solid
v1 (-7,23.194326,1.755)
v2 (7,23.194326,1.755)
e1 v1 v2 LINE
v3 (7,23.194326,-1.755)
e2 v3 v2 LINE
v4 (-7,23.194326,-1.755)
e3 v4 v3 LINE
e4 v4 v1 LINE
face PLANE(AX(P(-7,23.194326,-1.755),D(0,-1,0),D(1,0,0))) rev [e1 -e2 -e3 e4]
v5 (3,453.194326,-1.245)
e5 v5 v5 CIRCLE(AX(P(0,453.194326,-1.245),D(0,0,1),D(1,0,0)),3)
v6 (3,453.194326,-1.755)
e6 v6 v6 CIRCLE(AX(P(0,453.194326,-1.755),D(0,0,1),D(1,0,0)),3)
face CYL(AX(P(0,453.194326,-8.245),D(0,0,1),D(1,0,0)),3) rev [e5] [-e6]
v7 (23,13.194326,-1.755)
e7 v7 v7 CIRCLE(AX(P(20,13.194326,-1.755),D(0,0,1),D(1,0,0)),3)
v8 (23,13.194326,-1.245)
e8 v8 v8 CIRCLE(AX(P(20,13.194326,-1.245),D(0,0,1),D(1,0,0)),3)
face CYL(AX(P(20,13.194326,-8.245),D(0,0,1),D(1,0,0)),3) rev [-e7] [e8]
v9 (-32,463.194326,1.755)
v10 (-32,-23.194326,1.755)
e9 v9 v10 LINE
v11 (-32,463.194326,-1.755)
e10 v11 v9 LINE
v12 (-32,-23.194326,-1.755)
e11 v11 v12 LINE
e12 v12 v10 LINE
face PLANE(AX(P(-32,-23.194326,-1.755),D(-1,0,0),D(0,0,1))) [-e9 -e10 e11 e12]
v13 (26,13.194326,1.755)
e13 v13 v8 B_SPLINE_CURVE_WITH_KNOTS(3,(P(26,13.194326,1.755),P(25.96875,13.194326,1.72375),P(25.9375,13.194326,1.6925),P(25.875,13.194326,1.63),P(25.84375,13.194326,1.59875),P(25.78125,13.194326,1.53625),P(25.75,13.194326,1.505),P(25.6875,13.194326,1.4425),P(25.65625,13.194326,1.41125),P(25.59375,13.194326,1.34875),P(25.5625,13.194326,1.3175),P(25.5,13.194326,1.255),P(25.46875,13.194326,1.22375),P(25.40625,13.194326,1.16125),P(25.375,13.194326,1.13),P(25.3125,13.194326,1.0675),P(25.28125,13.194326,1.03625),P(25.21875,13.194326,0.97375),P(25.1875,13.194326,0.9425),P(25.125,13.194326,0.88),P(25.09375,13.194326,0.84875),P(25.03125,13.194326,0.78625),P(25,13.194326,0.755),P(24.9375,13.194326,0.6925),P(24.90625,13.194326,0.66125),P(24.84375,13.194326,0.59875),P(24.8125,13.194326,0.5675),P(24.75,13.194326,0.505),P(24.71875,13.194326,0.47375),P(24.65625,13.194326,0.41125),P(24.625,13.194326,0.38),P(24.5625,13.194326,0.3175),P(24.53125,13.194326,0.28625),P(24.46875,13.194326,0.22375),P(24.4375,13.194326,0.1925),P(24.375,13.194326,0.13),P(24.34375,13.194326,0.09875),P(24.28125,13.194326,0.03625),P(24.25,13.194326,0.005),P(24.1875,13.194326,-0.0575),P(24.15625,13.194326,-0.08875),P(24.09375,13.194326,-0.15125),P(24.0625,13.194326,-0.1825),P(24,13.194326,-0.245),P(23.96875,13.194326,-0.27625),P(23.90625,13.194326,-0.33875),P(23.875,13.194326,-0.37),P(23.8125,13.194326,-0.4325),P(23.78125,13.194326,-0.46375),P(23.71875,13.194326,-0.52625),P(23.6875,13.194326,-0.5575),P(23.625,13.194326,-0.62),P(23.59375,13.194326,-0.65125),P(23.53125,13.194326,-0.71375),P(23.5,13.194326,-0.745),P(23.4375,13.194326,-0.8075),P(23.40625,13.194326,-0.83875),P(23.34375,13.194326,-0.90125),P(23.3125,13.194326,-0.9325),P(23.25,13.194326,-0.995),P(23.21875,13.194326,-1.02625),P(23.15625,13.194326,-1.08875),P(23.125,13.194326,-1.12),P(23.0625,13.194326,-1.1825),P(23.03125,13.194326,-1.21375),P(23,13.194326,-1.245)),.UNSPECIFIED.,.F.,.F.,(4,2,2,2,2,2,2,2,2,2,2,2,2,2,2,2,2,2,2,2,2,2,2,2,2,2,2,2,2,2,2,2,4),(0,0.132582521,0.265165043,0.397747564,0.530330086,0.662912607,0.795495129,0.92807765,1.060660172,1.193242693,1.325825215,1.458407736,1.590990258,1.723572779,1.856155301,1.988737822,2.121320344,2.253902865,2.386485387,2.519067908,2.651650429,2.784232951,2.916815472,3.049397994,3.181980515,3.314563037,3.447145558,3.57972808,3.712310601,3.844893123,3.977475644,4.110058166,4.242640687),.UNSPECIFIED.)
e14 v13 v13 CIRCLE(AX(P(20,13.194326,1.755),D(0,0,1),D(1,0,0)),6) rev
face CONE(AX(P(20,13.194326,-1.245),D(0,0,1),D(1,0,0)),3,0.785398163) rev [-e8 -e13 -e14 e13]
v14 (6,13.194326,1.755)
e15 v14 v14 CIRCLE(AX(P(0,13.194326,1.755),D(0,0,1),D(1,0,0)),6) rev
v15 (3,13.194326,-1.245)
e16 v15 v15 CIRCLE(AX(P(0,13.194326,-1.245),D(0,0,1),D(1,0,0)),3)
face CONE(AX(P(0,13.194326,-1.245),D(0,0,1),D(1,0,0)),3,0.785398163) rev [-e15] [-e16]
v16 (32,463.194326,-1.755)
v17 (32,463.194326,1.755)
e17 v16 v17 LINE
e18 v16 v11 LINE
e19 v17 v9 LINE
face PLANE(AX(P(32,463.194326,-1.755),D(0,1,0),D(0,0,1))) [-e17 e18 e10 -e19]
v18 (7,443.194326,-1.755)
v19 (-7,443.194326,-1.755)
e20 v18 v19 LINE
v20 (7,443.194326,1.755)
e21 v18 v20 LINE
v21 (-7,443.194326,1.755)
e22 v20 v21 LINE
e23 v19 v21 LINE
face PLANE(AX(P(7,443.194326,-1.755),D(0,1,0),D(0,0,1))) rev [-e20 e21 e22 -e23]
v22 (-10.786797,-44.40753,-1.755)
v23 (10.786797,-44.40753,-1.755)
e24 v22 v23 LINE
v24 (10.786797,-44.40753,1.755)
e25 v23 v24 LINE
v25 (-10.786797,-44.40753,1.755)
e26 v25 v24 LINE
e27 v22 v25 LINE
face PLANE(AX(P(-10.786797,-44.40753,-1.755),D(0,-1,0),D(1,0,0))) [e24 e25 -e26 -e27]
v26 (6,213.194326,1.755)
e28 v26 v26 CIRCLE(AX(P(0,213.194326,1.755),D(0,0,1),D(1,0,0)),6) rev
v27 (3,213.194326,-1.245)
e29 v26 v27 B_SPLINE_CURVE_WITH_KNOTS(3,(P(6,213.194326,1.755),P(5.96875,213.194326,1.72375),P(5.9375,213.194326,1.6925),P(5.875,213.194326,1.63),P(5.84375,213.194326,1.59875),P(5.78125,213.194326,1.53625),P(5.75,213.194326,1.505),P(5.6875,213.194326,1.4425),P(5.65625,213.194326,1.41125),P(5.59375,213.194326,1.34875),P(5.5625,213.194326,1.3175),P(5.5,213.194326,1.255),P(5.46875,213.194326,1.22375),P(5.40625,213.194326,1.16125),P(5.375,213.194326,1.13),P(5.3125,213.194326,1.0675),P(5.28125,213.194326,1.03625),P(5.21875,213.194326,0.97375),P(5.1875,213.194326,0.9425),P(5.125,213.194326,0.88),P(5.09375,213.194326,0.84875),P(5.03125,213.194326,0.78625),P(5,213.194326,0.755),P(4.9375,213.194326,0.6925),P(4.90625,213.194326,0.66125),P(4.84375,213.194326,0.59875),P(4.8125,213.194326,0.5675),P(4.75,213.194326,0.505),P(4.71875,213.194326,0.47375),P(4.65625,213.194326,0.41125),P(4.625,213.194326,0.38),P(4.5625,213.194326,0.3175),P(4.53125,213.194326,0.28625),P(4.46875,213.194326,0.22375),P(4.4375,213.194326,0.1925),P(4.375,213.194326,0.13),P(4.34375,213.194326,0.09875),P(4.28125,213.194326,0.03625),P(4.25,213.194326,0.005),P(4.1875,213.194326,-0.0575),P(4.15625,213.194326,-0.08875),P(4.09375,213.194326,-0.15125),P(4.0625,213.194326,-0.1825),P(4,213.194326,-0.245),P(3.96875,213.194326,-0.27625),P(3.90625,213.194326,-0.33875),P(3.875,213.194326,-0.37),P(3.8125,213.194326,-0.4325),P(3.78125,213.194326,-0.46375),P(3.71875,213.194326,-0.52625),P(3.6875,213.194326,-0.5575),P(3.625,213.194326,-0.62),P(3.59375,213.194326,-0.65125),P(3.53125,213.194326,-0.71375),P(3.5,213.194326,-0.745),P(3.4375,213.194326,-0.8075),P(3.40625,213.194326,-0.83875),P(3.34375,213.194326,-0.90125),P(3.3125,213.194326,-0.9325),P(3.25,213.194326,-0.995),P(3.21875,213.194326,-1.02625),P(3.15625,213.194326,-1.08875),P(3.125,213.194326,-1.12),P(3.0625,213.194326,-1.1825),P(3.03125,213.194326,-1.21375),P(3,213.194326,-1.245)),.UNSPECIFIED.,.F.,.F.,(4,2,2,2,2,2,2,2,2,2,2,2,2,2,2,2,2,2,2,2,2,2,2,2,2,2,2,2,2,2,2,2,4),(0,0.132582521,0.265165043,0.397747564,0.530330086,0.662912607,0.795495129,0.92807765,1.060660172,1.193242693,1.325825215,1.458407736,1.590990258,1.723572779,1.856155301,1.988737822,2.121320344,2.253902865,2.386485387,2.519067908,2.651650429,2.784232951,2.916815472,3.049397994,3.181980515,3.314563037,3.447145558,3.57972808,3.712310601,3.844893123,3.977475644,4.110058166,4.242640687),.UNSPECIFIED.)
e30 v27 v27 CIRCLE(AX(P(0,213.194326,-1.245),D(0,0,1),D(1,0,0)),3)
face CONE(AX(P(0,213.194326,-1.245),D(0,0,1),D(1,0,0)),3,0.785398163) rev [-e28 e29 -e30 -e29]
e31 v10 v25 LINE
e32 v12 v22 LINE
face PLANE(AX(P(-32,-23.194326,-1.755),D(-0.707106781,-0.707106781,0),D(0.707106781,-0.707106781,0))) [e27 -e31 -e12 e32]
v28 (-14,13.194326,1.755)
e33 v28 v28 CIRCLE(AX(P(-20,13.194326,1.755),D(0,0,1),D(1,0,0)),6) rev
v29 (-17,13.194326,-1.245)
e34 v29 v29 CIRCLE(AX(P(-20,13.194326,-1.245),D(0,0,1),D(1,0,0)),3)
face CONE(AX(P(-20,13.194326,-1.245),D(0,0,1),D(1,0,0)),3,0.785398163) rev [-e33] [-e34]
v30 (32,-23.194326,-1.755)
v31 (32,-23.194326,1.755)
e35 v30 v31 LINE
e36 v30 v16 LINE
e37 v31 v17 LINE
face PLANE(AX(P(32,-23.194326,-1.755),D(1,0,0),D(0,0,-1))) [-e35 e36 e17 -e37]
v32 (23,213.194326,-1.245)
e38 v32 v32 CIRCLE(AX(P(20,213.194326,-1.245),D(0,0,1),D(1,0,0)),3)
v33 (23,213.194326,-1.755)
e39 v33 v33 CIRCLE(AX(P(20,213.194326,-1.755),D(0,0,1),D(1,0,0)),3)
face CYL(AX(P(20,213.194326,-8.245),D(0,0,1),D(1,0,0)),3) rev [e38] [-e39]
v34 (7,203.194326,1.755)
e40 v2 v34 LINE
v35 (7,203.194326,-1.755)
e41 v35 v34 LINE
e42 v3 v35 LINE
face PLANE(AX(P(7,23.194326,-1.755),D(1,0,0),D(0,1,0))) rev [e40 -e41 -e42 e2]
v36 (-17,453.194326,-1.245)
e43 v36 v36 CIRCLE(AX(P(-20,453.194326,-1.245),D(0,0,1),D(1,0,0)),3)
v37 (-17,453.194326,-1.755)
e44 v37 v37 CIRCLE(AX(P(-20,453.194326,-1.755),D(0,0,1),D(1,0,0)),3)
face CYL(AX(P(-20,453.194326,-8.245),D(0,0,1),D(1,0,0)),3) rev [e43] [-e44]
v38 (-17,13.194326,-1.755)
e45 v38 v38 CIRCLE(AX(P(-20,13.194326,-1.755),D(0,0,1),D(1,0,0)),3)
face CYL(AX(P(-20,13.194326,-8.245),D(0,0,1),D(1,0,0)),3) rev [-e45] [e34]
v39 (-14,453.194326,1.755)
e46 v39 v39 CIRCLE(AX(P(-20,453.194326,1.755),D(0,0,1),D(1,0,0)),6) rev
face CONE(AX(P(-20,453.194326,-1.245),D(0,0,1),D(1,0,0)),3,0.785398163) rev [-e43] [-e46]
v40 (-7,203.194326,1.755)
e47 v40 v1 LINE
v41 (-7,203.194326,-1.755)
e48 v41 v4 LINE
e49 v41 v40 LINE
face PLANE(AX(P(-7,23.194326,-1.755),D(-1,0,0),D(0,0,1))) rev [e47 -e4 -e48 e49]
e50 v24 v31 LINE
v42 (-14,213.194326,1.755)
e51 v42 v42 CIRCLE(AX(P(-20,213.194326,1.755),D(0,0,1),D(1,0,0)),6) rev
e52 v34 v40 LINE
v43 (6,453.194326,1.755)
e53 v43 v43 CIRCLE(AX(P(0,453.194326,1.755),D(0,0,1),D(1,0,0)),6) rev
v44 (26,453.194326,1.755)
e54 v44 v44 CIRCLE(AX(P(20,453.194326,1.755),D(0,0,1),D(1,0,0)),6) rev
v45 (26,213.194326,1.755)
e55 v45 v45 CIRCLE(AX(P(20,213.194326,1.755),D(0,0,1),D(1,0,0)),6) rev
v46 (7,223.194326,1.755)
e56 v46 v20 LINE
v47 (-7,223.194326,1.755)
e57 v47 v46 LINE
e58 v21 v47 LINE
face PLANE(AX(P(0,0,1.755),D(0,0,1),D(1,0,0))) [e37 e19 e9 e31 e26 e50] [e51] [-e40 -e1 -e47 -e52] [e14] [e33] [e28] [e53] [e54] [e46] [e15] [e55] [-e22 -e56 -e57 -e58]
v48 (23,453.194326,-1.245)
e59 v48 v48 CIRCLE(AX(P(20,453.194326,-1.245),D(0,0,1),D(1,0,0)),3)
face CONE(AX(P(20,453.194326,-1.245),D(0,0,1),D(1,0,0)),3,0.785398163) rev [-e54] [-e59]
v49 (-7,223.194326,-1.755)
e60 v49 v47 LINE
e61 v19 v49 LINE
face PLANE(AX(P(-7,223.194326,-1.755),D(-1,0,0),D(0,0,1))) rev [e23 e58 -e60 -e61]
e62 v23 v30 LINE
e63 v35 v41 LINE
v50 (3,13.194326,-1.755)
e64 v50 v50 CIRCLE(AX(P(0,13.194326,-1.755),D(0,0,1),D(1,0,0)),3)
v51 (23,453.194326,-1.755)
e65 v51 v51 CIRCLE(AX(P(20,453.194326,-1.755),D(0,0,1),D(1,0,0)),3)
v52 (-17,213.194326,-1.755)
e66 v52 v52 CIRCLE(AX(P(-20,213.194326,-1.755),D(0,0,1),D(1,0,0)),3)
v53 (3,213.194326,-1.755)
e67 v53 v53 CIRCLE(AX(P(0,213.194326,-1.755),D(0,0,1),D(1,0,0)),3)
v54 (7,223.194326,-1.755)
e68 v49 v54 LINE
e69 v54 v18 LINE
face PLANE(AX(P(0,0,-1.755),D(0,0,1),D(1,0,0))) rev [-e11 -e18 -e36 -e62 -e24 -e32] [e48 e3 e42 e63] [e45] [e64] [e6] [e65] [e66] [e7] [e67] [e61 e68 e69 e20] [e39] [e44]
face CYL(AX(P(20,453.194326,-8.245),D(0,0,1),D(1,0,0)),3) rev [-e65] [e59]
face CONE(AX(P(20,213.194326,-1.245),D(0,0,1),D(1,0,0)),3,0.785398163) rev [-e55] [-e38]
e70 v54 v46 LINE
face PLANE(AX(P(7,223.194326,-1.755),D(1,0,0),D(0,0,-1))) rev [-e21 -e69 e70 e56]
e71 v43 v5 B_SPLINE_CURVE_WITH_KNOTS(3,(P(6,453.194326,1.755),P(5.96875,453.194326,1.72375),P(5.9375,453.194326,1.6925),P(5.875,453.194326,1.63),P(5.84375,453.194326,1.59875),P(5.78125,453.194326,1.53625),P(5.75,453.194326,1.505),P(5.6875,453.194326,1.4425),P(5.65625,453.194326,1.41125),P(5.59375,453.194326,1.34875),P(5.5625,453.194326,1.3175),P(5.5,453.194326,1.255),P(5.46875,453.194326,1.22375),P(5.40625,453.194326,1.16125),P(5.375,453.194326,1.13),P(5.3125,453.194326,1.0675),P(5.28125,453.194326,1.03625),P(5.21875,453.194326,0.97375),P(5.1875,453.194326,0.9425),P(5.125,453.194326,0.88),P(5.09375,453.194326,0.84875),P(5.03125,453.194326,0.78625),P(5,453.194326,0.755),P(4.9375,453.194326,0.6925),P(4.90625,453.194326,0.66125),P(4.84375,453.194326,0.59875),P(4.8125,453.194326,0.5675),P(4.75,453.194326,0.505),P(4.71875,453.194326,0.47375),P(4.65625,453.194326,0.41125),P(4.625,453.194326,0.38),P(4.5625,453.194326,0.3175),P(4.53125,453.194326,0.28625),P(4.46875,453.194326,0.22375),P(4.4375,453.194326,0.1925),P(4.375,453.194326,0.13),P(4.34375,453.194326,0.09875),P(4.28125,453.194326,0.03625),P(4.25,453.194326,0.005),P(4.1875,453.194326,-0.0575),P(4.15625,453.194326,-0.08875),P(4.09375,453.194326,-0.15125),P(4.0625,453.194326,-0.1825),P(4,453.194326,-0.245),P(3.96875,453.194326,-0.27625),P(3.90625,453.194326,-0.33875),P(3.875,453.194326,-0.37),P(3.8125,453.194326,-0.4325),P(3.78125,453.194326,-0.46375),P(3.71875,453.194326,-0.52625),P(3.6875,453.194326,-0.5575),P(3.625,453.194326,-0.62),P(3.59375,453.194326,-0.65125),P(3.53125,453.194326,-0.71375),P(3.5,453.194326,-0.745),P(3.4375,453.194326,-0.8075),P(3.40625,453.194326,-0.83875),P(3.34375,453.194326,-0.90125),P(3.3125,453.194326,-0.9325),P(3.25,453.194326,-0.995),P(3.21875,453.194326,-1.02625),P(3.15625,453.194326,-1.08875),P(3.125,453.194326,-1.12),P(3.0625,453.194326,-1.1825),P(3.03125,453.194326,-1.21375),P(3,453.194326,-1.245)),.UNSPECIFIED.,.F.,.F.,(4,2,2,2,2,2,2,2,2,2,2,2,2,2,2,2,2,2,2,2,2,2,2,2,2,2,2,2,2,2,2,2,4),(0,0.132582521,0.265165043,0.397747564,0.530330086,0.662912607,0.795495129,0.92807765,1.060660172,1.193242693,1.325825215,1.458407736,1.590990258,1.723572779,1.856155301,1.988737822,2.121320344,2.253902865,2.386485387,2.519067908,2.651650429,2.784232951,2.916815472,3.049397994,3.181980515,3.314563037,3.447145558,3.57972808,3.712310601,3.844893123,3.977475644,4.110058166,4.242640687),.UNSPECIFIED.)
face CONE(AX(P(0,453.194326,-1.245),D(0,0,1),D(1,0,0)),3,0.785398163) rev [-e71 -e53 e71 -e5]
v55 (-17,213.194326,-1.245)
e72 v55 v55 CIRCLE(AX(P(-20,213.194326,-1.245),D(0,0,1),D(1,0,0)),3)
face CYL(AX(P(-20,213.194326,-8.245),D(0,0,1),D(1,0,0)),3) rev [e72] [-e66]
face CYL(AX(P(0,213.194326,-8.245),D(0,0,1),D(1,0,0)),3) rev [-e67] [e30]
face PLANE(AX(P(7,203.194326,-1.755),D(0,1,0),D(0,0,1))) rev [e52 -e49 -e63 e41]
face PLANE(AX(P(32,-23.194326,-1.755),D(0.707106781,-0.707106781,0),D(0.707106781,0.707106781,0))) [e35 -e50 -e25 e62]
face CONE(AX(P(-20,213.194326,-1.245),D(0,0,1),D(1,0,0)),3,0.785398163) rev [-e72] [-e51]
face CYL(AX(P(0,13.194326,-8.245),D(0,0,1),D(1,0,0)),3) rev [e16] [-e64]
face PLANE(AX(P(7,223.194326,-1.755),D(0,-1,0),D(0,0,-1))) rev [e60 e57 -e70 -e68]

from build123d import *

# Parameters (mm, degrees)
BASE_FLANGE1_START       = -1.755
BASE_FLANGE1_OUTLINE_W   = 14
BASE_FLANGE1_OUTLINE_H   = 180
BASE_FLANGE1_OUTLINE_H_2 = 220
BASE_FLANGE1_DEPTH       = 3.51
SKETCH2_R                = 3
CUT_EXTRUDE2_DEPTH       = 10
CHAMFER1_SIZE            = 3


# Read off the part's stored shape, not the designer's step: Base-Flange1
with BuildPart() as part:
    # Base-Flange1 outline → Base-Flange1 (new body)
    with BuildSketch(Plane.XY.offset(BASE_FLANGE1_START)):
        Polygon((10.786796564, -44.407529677), (32, -23.194326241), (32, 463.194326241), (-32, 463.194326241), (-32, -23.194326241), (-10.786796564, -44.407529677), align=None)
        with Locations((0, 113.194326241)):
            Rectangle(BASE_FLANGE1_OUTLINE_W, BASE_FLANGE1_OUTLINE_H, mode=Mode.SUBTRACT)
        with Locations((0, 333.194326241)):
            Rectangle(BASE_FLANGE1_OUTLINE_W, BASE_FLANGE1_OUTLINE_H_2, mode=Mode.SUBTRACT)
    extrude(amount=BASE_FLANGE1_DEPTH)

    # Sketch2 → Cut-Extrude2 (cut)
    with BuildSketch(Plane.XY.offset(1.755)):
        with Locations((-20, 213.194326241)):
            Circle(SKETCH2_R)
        with Locations((0, 213.194326241)):
            Circle(SKETCH2_R)
        with Locations((20, 213.194326241)):
            Circle(SKETCH2_R)
        with Locations((0, 453.194326241)):
            Circle(SKETCH2_R)
        with Locations((20, 453.194326241)):
            Circle(SKETCH2_R)
        with Locations((-20, 453.194326241)):
            Circle(SKETCH2_R)
        with Locations((0, 13.194326241)):
            Circle(SKETCH2_R)
        with Locations((20, 13.194326241)):
            Circle(SKETCH2_R)
        with Locations((-20, 13.194326241)):
            Circle(SKETCH2_R)
    extrude(amount=-CUT_EXTRUDE2_DEPTH, mode=Mode.SUBTRACT)

    # Chamfer1
    chamfer1_edges = [part.edges().sort_by_distance(p)[0] for p in [
        (-3, 453.194326241, 1.755),
        (17, 453.194326241, 1.755),
        (-23, 13.194326241, 1.755),
        (17, 13.194326241, 1.755),
        (-3, 13.194326241, 1.755),
        (-23, 453.194326241, 1.755),
        (-23, 213.194326241, 1.755),
        (-3, 213.194326241, 1.755),
        (17, 213.194326241, 1.755),
    ]]
    chamfer(chamfer1_edges, length=CHAMFER1_SIZE)


solid = part.part
